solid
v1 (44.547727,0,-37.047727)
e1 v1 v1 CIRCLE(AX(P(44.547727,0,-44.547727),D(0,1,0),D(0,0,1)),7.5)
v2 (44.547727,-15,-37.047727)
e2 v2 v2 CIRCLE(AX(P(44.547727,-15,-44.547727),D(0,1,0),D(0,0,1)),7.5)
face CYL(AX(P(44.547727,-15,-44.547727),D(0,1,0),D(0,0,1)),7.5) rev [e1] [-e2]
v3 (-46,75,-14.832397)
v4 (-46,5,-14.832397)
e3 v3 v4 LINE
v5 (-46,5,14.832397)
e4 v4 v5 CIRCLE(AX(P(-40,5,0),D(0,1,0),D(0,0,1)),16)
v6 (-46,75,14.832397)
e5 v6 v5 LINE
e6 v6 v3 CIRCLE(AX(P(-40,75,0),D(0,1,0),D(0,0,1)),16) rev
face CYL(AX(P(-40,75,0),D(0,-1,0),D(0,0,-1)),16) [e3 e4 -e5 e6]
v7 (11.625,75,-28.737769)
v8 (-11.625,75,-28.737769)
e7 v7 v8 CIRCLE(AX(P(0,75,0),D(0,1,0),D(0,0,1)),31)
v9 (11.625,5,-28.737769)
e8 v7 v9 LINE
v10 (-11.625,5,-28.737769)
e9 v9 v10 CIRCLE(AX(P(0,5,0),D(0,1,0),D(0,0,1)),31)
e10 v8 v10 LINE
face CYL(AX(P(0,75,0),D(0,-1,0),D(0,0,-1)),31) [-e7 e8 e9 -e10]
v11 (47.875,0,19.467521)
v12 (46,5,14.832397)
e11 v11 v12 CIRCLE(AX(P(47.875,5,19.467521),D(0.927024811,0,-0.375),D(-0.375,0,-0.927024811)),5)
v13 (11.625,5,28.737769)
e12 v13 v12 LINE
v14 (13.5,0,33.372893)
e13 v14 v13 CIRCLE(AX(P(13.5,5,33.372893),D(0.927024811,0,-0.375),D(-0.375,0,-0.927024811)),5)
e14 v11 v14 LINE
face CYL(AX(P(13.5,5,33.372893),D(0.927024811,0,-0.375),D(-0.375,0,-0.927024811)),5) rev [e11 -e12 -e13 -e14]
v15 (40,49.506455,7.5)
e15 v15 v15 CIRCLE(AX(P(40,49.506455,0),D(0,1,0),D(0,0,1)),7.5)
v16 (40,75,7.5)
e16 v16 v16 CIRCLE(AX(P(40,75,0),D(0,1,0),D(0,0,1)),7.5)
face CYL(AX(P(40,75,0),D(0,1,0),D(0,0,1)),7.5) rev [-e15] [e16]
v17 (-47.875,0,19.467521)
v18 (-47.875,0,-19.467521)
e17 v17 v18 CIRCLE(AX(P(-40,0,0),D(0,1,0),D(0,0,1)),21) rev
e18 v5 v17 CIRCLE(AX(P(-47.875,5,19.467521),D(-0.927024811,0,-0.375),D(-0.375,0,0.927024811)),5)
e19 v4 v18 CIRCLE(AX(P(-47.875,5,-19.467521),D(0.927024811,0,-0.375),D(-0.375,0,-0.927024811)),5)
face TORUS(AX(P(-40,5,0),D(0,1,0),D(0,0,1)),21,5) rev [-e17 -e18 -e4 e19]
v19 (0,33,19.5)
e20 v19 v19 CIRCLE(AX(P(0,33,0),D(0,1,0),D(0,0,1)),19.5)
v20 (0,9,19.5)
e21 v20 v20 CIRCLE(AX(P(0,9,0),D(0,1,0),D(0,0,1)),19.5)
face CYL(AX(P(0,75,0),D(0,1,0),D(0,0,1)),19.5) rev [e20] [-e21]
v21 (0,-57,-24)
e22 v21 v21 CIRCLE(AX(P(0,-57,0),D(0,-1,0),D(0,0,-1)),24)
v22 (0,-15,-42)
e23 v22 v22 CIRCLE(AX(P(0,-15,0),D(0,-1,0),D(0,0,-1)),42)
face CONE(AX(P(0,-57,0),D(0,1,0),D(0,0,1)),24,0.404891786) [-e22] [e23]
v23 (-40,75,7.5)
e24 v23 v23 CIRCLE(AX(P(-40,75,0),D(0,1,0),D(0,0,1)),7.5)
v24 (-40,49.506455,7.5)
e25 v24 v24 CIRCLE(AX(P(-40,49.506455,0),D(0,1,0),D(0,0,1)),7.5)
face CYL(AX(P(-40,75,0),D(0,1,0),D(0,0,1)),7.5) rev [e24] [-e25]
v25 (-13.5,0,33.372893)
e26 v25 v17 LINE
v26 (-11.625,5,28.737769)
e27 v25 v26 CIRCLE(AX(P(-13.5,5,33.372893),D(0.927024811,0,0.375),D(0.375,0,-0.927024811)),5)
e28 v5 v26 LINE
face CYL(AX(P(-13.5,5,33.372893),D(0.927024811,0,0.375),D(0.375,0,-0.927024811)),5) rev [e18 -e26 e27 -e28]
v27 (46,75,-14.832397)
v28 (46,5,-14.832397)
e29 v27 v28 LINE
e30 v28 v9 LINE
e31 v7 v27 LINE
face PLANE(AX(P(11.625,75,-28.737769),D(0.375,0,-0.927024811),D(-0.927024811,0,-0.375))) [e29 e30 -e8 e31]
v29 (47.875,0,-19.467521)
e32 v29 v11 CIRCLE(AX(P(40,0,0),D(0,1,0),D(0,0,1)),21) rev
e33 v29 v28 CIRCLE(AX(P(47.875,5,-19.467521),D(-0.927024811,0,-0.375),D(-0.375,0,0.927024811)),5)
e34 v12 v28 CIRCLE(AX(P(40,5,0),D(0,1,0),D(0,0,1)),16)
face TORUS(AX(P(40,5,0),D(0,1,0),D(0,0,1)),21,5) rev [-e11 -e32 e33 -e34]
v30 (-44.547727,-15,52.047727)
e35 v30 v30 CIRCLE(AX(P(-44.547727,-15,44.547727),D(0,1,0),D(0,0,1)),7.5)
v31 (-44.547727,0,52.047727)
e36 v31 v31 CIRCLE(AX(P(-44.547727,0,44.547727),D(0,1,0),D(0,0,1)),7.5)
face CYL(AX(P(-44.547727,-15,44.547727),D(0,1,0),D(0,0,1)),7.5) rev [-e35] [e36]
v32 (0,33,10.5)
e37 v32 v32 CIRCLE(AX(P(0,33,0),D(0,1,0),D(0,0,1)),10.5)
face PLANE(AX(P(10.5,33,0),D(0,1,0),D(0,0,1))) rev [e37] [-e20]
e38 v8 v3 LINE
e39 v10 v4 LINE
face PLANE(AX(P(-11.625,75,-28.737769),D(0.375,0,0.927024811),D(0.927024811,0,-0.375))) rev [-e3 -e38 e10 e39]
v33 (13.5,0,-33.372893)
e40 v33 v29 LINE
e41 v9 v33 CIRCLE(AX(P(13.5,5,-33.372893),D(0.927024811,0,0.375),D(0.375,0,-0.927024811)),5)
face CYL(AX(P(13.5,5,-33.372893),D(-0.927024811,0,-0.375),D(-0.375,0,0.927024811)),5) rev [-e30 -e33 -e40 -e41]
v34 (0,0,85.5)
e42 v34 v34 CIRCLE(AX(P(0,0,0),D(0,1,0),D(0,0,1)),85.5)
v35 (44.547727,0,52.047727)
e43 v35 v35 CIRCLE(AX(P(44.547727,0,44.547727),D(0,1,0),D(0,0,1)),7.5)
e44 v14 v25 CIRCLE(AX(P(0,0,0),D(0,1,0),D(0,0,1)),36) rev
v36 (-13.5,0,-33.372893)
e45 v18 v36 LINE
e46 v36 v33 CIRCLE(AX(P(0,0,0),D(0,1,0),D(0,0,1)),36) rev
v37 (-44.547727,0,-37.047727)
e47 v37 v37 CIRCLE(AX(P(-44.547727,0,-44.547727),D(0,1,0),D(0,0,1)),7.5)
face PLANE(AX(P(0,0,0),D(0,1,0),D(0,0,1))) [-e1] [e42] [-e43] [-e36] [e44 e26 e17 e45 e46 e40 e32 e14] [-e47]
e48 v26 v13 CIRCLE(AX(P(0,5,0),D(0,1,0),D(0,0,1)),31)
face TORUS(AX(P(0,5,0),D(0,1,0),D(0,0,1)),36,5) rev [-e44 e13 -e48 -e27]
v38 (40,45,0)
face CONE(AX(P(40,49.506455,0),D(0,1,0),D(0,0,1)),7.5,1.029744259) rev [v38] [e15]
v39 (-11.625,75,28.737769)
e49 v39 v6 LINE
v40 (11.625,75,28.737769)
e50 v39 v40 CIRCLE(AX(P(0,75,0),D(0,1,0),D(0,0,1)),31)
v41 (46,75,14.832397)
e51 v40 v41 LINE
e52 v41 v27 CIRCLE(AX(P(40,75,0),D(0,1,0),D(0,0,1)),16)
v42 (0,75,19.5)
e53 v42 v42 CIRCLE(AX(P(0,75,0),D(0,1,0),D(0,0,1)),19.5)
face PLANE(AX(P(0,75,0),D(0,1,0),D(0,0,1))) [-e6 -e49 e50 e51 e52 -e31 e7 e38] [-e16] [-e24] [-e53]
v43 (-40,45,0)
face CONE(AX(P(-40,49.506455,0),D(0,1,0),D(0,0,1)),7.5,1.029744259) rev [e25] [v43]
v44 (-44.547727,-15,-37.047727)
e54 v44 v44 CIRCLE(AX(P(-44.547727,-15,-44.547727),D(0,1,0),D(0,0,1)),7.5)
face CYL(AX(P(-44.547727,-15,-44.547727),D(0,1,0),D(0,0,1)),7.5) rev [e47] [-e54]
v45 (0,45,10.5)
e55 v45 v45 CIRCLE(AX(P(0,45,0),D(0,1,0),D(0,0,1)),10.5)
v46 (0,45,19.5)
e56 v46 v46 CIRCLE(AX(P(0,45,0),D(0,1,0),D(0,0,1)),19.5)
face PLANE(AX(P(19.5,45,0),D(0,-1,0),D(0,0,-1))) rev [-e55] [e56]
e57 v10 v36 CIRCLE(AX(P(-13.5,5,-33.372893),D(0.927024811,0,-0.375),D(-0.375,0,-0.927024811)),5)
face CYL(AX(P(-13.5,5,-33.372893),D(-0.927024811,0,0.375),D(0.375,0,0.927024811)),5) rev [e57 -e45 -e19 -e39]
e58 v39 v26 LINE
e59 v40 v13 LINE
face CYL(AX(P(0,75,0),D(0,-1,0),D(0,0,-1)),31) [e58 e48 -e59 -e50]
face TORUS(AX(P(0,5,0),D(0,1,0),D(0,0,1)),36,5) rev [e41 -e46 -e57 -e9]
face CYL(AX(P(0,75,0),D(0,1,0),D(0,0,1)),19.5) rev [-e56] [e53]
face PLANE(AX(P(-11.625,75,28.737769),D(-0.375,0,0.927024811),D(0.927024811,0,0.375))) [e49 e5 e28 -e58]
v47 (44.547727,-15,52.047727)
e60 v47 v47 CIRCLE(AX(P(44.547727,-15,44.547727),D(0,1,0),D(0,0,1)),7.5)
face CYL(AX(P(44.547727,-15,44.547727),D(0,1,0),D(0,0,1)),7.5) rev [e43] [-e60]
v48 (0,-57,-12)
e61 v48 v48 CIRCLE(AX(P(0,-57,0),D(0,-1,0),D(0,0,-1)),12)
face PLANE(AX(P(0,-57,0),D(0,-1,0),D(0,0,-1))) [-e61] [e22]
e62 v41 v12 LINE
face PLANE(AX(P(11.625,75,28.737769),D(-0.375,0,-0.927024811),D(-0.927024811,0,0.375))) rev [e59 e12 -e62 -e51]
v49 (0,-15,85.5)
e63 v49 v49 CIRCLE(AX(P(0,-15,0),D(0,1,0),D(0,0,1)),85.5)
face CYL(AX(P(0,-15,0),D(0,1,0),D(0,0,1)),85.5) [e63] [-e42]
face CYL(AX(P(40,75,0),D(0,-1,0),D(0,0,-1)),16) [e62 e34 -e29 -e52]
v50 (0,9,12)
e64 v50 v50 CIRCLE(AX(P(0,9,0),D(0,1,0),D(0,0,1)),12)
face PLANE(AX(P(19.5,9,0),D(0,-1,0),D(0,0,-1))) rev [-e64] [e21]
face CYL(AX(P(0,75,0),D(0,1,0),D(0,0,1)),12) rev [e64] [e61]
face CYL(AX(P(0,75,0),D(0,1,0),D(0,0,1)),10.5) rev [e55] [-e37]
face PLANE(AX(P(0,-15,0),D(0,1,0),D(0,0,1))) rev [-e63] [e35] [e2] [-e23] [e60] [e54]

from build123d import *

# Parameters (mm, degrees)
SKETCH1_R                   = 7.5
SKETCH1_R_2                 = 19.5
SKETCH1_R_3                 = 10.5
BOSS_EXTRUDE1_DEPTH         = 75
SKETCH1_3_R                 = 85.5
SKETCH1_3_R_2               = 7.5
BOSS_EXTRUDE2_DEPTH         = 15
F_1_0MM_DOWEL_HOLE1_D       = 15
F_1_0MM_DOWEL_HOLE1_DEPTH   = 25.493545357
F_1_0MM_DOWEL_HOLE1_TIP     = 4.506454643
SKETCH4_R                   = 42
SKETCH5_R                   = 24
ADVANCEDHOLE1_START         = -57
ADVANCEDHOLE1_OUTLINE_R     = 10.5
ADVANCEDHOLE1_DEPTH         = 132
ADVANCEDHOLE1_START_2       = 45
ADVANCEDHOLE1_2_OUTLINE_R   = 19.5
ADVANCEDHOLE1_2_OUTLINE_R_2 = 10.5
ADVANCEDHOLE1_2_DEPTH       = 30
ADVANCEDHOLE1_START_3       = 9
ADVANCEDHOLE1_3_OUTLINE_R   = 19.5
ADVANCEDHOLE1_3_OUTLINE_R_2 = 10.5
ADVANCEDHOLE1_3_DEPTH       = 24
ADVANCEDHOLE1_4_OUTLINE_R   = 12
ADVANCEDHOLE1_4_OUTLINE_R_2 = 10.5
ADVANCEDHOLE1_4_DEPTH       = 66
FILLET1_R                   = 5


# Read off the part's stored shape, not the designer's step: AdvancedHole1
with BuildPart() as part:
    # Sketch1 → Boss-Extrude1 (new body)
    # profile 1 of 5: a face of its own
    with BuildSketch(Plane(origin=(0, 0, 0), x_dir=(1, 0, 0), z_dir=(0, 1, 0))):
        with BuildLine():
            Line((11.625, 28.737769137), (46, 14.832396974))
            ThreePointArc((46, 14.832396974), (56, 0), (46, -14.832396974))
            Line((46, -14.832396974), (11.625, -28.737769137))
            ThreePointArc((11.625, -28.737769137), (0, -31), (-11.625, -28.737769137))
            Line((-11.625, -28.737769137), (-46, -14.832396974))
            ThreePointArc((-46, -14.832396974), (-56, 0), (-46, 14.832396974))
            Line((-46, 14.832396974), (-11.625, 28.737769137))
            ThreePointArc((-11.625, 28.737769137), (0, 31), (11.625, 28.737769137))
        make_face()
        with Locations((-40, 0)):
            Circle(SKETCH1_R, mode=Mode.SUBTRACT)
        with Locations((40, 0)):
            Circle(SKETCH1_R, mode=Mode.SUBTRACT)
        Circle(SKETCH1_R_2, mode=Mode.SUBTRACT)
    # profile 2 of 5: a face of its own
    with BuildSketch(Plane(origin=(0, 0, 0), x_dir=(1, 0, 0), z_dir=(0, 1, 0))):
        Circle(SKETCH1_R_2)
        Circle(SKETCH1_R_3, mode=Mode.SUBTRACT)
    # profile 3 of 5: a face of its own
    with BuildSketch(Plane(origin=(0, 0, 0), x_dir=(1, 0, 0), z_dir=(0, 1, 0))):
        Circle(SKETCH1_R_3)
    # profile 4 of 5: a face of its own
    with BuildSketch(Plane(origin=(0, 0, 0), x_dir=(1, 0, 0), z_dir=(0, 1, 0))):
        with Locations((40, 0)):
            Circle(SKETCH1_R)
    # profile 5 of 5: a face of its own
    with BuildSketch(Plane(origin=(0, 0, 0), x_dir=(1, 0, 0), z_dir=(0, 1, 0))):
        with Locations((-40, 0)):
            Circle(SKETCH1_R)
    extrude(amount=BOSS_EXTRUDE1_DEPTH)

    # Sketch1<3> → Boss-Extrude2 (add)
    with BuildSketch(Plane(origin=(0, 0, 0), x_dir=(1, 0, 0), z_dir=(0, 1, 0))):
        with Locations(Location((0, 0, 0), (0, 0, 270))):
            Circle(SKETCH1_3_R)
        with Locations(Location((44.547727215, 44.547727215, 0), (0, 0, 270))):
            Circle(SKETCH1_3_R_2, mode=Mode.SUBTRACT)
        with Locations(Location((44.547727215, -44.547727215, 0), (0, 0, 270))):
            Circle(SKETCH1_3_R_2, mode=Mode.SUBTRACT)
        with Locations(Location((-44.547727215, -44.547727215, 0), (0, 0, 270))):
            Circle(SKETCH1_3_R_2, mode=Mode.SUBTRACT)
        with Locations(Location((-44.547727215, 44.547727215, 0), (0, 0, 270))):
            Circle(SKETCH1_3_R_2, mode=Mode.SUBTRACT)
    extrude(amount=-BOSS_EXTRUDE2_DEPTH)

    # Ø1.0mm Dowel Hole1
    with Locations(Plane(origin=(-40, 75, 0), x_dir=(0, 0, 1), z_dir=(0, 1, 0))):
        with Locations((0, 0), (0, 80)):
            Hole(F_1_0MM_DOWEL_HOLE1_D / 2, depth=F_1_0MM_DOWEL_HOLE1_DEPTH)
            with Locations((0, 0, -(F_1_0MM_DOWEL_HOLE1_DEPTH + F_1_0MM_DOWEL_HOLE1_TIP / 2))):  # 118° drill point
                Cone(0, F_1_0MM_DOWEL_HOLE1_D / 2, F_1_0MM_DOWEL_HOLE1_TIP, mode=Mode.SUBTRACT)

    # Sketch4 → Loft1 section 0
    with BuildSketch(Plane.XZ.offset(15)):
        Circle(SKETCH4_R)
    # Sketch5 → Loft1 section 1
    with BuildSketch(Plane(origin=(0, -57, 0), x_dir=(-1, 0, 0), z_dir=(0, -1, 0))):
        Circle(SKETCH5_R)
    loft()

    # AdvancedHole1 outline → AdvancedHole1 (cut)
    with BuildSketch(Plane(origin=(0, 0, 0), x_dir=(1, 0, 0), z_dir=(0, 1, 0)).offset(ADVANCEDHOLE1_START)):
        Circle(ADVANCEDHOLE1_OUTLINE_R)
    extrude(amount=ADVANCEDHOLE1_DEPTH, mode=Mode.SUBTRACT)

    # AdvancedHole1 2 outline → AdvancedHole1 2 (cut)
    with BuildSketch(Plane(origin=(0, 0, 0), x_dir=(1, 0, 0), z_dir=(0, 1, 0)).offset(ADVANCEDHOLE1_START_2)):
        Circle(ADVANCEDHOLE1_2_OUTLINE_R)
        Circle(ADVANCEDHOLE1_2_OUTLINE_R_2, mode=Mode.SUBTRACT)
    extrude(amount=ADVANCEDHOLE1_2_DEPTH, mode=Mode.SUBTRACT)

    # AdvancedHole1 3 outline → AdvancedHole1 3 (cut)
    with BuildSketch(Plane(origin=(0, 0, 0), x_dir=(1, 0, 0), z_dir=(0, 1, 0)).offset(ADVANCEDHOLE1_START_3)):
        Circle(ADVANCEDHOLE1_3_OUTLINE_R)
        Circle(ADVANCEDHOLE1_3_OUTLINE_R_2, mode=Mode.SUBTRACT)
    extrude(amount=ADVANCEDHOLE1_3_DEPTH, mode=Mode.SUBTRACT)

    # AdvancedHole1 4 outline → AdvancedHole1 4 (cut)
    with BuildSketch(Plane(origin=(0, 0, 0), x_dir=(1, 0, 0), z_dir=(0, 1, 0)).offset(ADVANCEDHOLE1_START)):
        Circle(ADVANCEDHOLE1_4_OUTLINE_R)
        Circle(ADVANCEDHOLE1_4_OUTLINE_R_2, mode=Mode.SUBTRACT)
    extrude(amount=ADVANCEDHOLE1_4_DEPTH, mode=Mode.SUBTRACT)

    # Fillet1
    fillet1_edges = [part.edges().sort_by_distance(p)[0] for p in [
        (28.8125, 0, 21.785083056),
        (0, 0, 31),
        (-28.8125, 0, 21.785083056),
        (-56, 0, 0),
        (-28.8125, 0, -21.785083056),
        (0, 0, -31),
        (28.8125, 0, -21.785083056),
        (56, 0, 0),
    ]]
    fillet(fillet1_edges, radius=FILLET1_R)


solid = part.part
